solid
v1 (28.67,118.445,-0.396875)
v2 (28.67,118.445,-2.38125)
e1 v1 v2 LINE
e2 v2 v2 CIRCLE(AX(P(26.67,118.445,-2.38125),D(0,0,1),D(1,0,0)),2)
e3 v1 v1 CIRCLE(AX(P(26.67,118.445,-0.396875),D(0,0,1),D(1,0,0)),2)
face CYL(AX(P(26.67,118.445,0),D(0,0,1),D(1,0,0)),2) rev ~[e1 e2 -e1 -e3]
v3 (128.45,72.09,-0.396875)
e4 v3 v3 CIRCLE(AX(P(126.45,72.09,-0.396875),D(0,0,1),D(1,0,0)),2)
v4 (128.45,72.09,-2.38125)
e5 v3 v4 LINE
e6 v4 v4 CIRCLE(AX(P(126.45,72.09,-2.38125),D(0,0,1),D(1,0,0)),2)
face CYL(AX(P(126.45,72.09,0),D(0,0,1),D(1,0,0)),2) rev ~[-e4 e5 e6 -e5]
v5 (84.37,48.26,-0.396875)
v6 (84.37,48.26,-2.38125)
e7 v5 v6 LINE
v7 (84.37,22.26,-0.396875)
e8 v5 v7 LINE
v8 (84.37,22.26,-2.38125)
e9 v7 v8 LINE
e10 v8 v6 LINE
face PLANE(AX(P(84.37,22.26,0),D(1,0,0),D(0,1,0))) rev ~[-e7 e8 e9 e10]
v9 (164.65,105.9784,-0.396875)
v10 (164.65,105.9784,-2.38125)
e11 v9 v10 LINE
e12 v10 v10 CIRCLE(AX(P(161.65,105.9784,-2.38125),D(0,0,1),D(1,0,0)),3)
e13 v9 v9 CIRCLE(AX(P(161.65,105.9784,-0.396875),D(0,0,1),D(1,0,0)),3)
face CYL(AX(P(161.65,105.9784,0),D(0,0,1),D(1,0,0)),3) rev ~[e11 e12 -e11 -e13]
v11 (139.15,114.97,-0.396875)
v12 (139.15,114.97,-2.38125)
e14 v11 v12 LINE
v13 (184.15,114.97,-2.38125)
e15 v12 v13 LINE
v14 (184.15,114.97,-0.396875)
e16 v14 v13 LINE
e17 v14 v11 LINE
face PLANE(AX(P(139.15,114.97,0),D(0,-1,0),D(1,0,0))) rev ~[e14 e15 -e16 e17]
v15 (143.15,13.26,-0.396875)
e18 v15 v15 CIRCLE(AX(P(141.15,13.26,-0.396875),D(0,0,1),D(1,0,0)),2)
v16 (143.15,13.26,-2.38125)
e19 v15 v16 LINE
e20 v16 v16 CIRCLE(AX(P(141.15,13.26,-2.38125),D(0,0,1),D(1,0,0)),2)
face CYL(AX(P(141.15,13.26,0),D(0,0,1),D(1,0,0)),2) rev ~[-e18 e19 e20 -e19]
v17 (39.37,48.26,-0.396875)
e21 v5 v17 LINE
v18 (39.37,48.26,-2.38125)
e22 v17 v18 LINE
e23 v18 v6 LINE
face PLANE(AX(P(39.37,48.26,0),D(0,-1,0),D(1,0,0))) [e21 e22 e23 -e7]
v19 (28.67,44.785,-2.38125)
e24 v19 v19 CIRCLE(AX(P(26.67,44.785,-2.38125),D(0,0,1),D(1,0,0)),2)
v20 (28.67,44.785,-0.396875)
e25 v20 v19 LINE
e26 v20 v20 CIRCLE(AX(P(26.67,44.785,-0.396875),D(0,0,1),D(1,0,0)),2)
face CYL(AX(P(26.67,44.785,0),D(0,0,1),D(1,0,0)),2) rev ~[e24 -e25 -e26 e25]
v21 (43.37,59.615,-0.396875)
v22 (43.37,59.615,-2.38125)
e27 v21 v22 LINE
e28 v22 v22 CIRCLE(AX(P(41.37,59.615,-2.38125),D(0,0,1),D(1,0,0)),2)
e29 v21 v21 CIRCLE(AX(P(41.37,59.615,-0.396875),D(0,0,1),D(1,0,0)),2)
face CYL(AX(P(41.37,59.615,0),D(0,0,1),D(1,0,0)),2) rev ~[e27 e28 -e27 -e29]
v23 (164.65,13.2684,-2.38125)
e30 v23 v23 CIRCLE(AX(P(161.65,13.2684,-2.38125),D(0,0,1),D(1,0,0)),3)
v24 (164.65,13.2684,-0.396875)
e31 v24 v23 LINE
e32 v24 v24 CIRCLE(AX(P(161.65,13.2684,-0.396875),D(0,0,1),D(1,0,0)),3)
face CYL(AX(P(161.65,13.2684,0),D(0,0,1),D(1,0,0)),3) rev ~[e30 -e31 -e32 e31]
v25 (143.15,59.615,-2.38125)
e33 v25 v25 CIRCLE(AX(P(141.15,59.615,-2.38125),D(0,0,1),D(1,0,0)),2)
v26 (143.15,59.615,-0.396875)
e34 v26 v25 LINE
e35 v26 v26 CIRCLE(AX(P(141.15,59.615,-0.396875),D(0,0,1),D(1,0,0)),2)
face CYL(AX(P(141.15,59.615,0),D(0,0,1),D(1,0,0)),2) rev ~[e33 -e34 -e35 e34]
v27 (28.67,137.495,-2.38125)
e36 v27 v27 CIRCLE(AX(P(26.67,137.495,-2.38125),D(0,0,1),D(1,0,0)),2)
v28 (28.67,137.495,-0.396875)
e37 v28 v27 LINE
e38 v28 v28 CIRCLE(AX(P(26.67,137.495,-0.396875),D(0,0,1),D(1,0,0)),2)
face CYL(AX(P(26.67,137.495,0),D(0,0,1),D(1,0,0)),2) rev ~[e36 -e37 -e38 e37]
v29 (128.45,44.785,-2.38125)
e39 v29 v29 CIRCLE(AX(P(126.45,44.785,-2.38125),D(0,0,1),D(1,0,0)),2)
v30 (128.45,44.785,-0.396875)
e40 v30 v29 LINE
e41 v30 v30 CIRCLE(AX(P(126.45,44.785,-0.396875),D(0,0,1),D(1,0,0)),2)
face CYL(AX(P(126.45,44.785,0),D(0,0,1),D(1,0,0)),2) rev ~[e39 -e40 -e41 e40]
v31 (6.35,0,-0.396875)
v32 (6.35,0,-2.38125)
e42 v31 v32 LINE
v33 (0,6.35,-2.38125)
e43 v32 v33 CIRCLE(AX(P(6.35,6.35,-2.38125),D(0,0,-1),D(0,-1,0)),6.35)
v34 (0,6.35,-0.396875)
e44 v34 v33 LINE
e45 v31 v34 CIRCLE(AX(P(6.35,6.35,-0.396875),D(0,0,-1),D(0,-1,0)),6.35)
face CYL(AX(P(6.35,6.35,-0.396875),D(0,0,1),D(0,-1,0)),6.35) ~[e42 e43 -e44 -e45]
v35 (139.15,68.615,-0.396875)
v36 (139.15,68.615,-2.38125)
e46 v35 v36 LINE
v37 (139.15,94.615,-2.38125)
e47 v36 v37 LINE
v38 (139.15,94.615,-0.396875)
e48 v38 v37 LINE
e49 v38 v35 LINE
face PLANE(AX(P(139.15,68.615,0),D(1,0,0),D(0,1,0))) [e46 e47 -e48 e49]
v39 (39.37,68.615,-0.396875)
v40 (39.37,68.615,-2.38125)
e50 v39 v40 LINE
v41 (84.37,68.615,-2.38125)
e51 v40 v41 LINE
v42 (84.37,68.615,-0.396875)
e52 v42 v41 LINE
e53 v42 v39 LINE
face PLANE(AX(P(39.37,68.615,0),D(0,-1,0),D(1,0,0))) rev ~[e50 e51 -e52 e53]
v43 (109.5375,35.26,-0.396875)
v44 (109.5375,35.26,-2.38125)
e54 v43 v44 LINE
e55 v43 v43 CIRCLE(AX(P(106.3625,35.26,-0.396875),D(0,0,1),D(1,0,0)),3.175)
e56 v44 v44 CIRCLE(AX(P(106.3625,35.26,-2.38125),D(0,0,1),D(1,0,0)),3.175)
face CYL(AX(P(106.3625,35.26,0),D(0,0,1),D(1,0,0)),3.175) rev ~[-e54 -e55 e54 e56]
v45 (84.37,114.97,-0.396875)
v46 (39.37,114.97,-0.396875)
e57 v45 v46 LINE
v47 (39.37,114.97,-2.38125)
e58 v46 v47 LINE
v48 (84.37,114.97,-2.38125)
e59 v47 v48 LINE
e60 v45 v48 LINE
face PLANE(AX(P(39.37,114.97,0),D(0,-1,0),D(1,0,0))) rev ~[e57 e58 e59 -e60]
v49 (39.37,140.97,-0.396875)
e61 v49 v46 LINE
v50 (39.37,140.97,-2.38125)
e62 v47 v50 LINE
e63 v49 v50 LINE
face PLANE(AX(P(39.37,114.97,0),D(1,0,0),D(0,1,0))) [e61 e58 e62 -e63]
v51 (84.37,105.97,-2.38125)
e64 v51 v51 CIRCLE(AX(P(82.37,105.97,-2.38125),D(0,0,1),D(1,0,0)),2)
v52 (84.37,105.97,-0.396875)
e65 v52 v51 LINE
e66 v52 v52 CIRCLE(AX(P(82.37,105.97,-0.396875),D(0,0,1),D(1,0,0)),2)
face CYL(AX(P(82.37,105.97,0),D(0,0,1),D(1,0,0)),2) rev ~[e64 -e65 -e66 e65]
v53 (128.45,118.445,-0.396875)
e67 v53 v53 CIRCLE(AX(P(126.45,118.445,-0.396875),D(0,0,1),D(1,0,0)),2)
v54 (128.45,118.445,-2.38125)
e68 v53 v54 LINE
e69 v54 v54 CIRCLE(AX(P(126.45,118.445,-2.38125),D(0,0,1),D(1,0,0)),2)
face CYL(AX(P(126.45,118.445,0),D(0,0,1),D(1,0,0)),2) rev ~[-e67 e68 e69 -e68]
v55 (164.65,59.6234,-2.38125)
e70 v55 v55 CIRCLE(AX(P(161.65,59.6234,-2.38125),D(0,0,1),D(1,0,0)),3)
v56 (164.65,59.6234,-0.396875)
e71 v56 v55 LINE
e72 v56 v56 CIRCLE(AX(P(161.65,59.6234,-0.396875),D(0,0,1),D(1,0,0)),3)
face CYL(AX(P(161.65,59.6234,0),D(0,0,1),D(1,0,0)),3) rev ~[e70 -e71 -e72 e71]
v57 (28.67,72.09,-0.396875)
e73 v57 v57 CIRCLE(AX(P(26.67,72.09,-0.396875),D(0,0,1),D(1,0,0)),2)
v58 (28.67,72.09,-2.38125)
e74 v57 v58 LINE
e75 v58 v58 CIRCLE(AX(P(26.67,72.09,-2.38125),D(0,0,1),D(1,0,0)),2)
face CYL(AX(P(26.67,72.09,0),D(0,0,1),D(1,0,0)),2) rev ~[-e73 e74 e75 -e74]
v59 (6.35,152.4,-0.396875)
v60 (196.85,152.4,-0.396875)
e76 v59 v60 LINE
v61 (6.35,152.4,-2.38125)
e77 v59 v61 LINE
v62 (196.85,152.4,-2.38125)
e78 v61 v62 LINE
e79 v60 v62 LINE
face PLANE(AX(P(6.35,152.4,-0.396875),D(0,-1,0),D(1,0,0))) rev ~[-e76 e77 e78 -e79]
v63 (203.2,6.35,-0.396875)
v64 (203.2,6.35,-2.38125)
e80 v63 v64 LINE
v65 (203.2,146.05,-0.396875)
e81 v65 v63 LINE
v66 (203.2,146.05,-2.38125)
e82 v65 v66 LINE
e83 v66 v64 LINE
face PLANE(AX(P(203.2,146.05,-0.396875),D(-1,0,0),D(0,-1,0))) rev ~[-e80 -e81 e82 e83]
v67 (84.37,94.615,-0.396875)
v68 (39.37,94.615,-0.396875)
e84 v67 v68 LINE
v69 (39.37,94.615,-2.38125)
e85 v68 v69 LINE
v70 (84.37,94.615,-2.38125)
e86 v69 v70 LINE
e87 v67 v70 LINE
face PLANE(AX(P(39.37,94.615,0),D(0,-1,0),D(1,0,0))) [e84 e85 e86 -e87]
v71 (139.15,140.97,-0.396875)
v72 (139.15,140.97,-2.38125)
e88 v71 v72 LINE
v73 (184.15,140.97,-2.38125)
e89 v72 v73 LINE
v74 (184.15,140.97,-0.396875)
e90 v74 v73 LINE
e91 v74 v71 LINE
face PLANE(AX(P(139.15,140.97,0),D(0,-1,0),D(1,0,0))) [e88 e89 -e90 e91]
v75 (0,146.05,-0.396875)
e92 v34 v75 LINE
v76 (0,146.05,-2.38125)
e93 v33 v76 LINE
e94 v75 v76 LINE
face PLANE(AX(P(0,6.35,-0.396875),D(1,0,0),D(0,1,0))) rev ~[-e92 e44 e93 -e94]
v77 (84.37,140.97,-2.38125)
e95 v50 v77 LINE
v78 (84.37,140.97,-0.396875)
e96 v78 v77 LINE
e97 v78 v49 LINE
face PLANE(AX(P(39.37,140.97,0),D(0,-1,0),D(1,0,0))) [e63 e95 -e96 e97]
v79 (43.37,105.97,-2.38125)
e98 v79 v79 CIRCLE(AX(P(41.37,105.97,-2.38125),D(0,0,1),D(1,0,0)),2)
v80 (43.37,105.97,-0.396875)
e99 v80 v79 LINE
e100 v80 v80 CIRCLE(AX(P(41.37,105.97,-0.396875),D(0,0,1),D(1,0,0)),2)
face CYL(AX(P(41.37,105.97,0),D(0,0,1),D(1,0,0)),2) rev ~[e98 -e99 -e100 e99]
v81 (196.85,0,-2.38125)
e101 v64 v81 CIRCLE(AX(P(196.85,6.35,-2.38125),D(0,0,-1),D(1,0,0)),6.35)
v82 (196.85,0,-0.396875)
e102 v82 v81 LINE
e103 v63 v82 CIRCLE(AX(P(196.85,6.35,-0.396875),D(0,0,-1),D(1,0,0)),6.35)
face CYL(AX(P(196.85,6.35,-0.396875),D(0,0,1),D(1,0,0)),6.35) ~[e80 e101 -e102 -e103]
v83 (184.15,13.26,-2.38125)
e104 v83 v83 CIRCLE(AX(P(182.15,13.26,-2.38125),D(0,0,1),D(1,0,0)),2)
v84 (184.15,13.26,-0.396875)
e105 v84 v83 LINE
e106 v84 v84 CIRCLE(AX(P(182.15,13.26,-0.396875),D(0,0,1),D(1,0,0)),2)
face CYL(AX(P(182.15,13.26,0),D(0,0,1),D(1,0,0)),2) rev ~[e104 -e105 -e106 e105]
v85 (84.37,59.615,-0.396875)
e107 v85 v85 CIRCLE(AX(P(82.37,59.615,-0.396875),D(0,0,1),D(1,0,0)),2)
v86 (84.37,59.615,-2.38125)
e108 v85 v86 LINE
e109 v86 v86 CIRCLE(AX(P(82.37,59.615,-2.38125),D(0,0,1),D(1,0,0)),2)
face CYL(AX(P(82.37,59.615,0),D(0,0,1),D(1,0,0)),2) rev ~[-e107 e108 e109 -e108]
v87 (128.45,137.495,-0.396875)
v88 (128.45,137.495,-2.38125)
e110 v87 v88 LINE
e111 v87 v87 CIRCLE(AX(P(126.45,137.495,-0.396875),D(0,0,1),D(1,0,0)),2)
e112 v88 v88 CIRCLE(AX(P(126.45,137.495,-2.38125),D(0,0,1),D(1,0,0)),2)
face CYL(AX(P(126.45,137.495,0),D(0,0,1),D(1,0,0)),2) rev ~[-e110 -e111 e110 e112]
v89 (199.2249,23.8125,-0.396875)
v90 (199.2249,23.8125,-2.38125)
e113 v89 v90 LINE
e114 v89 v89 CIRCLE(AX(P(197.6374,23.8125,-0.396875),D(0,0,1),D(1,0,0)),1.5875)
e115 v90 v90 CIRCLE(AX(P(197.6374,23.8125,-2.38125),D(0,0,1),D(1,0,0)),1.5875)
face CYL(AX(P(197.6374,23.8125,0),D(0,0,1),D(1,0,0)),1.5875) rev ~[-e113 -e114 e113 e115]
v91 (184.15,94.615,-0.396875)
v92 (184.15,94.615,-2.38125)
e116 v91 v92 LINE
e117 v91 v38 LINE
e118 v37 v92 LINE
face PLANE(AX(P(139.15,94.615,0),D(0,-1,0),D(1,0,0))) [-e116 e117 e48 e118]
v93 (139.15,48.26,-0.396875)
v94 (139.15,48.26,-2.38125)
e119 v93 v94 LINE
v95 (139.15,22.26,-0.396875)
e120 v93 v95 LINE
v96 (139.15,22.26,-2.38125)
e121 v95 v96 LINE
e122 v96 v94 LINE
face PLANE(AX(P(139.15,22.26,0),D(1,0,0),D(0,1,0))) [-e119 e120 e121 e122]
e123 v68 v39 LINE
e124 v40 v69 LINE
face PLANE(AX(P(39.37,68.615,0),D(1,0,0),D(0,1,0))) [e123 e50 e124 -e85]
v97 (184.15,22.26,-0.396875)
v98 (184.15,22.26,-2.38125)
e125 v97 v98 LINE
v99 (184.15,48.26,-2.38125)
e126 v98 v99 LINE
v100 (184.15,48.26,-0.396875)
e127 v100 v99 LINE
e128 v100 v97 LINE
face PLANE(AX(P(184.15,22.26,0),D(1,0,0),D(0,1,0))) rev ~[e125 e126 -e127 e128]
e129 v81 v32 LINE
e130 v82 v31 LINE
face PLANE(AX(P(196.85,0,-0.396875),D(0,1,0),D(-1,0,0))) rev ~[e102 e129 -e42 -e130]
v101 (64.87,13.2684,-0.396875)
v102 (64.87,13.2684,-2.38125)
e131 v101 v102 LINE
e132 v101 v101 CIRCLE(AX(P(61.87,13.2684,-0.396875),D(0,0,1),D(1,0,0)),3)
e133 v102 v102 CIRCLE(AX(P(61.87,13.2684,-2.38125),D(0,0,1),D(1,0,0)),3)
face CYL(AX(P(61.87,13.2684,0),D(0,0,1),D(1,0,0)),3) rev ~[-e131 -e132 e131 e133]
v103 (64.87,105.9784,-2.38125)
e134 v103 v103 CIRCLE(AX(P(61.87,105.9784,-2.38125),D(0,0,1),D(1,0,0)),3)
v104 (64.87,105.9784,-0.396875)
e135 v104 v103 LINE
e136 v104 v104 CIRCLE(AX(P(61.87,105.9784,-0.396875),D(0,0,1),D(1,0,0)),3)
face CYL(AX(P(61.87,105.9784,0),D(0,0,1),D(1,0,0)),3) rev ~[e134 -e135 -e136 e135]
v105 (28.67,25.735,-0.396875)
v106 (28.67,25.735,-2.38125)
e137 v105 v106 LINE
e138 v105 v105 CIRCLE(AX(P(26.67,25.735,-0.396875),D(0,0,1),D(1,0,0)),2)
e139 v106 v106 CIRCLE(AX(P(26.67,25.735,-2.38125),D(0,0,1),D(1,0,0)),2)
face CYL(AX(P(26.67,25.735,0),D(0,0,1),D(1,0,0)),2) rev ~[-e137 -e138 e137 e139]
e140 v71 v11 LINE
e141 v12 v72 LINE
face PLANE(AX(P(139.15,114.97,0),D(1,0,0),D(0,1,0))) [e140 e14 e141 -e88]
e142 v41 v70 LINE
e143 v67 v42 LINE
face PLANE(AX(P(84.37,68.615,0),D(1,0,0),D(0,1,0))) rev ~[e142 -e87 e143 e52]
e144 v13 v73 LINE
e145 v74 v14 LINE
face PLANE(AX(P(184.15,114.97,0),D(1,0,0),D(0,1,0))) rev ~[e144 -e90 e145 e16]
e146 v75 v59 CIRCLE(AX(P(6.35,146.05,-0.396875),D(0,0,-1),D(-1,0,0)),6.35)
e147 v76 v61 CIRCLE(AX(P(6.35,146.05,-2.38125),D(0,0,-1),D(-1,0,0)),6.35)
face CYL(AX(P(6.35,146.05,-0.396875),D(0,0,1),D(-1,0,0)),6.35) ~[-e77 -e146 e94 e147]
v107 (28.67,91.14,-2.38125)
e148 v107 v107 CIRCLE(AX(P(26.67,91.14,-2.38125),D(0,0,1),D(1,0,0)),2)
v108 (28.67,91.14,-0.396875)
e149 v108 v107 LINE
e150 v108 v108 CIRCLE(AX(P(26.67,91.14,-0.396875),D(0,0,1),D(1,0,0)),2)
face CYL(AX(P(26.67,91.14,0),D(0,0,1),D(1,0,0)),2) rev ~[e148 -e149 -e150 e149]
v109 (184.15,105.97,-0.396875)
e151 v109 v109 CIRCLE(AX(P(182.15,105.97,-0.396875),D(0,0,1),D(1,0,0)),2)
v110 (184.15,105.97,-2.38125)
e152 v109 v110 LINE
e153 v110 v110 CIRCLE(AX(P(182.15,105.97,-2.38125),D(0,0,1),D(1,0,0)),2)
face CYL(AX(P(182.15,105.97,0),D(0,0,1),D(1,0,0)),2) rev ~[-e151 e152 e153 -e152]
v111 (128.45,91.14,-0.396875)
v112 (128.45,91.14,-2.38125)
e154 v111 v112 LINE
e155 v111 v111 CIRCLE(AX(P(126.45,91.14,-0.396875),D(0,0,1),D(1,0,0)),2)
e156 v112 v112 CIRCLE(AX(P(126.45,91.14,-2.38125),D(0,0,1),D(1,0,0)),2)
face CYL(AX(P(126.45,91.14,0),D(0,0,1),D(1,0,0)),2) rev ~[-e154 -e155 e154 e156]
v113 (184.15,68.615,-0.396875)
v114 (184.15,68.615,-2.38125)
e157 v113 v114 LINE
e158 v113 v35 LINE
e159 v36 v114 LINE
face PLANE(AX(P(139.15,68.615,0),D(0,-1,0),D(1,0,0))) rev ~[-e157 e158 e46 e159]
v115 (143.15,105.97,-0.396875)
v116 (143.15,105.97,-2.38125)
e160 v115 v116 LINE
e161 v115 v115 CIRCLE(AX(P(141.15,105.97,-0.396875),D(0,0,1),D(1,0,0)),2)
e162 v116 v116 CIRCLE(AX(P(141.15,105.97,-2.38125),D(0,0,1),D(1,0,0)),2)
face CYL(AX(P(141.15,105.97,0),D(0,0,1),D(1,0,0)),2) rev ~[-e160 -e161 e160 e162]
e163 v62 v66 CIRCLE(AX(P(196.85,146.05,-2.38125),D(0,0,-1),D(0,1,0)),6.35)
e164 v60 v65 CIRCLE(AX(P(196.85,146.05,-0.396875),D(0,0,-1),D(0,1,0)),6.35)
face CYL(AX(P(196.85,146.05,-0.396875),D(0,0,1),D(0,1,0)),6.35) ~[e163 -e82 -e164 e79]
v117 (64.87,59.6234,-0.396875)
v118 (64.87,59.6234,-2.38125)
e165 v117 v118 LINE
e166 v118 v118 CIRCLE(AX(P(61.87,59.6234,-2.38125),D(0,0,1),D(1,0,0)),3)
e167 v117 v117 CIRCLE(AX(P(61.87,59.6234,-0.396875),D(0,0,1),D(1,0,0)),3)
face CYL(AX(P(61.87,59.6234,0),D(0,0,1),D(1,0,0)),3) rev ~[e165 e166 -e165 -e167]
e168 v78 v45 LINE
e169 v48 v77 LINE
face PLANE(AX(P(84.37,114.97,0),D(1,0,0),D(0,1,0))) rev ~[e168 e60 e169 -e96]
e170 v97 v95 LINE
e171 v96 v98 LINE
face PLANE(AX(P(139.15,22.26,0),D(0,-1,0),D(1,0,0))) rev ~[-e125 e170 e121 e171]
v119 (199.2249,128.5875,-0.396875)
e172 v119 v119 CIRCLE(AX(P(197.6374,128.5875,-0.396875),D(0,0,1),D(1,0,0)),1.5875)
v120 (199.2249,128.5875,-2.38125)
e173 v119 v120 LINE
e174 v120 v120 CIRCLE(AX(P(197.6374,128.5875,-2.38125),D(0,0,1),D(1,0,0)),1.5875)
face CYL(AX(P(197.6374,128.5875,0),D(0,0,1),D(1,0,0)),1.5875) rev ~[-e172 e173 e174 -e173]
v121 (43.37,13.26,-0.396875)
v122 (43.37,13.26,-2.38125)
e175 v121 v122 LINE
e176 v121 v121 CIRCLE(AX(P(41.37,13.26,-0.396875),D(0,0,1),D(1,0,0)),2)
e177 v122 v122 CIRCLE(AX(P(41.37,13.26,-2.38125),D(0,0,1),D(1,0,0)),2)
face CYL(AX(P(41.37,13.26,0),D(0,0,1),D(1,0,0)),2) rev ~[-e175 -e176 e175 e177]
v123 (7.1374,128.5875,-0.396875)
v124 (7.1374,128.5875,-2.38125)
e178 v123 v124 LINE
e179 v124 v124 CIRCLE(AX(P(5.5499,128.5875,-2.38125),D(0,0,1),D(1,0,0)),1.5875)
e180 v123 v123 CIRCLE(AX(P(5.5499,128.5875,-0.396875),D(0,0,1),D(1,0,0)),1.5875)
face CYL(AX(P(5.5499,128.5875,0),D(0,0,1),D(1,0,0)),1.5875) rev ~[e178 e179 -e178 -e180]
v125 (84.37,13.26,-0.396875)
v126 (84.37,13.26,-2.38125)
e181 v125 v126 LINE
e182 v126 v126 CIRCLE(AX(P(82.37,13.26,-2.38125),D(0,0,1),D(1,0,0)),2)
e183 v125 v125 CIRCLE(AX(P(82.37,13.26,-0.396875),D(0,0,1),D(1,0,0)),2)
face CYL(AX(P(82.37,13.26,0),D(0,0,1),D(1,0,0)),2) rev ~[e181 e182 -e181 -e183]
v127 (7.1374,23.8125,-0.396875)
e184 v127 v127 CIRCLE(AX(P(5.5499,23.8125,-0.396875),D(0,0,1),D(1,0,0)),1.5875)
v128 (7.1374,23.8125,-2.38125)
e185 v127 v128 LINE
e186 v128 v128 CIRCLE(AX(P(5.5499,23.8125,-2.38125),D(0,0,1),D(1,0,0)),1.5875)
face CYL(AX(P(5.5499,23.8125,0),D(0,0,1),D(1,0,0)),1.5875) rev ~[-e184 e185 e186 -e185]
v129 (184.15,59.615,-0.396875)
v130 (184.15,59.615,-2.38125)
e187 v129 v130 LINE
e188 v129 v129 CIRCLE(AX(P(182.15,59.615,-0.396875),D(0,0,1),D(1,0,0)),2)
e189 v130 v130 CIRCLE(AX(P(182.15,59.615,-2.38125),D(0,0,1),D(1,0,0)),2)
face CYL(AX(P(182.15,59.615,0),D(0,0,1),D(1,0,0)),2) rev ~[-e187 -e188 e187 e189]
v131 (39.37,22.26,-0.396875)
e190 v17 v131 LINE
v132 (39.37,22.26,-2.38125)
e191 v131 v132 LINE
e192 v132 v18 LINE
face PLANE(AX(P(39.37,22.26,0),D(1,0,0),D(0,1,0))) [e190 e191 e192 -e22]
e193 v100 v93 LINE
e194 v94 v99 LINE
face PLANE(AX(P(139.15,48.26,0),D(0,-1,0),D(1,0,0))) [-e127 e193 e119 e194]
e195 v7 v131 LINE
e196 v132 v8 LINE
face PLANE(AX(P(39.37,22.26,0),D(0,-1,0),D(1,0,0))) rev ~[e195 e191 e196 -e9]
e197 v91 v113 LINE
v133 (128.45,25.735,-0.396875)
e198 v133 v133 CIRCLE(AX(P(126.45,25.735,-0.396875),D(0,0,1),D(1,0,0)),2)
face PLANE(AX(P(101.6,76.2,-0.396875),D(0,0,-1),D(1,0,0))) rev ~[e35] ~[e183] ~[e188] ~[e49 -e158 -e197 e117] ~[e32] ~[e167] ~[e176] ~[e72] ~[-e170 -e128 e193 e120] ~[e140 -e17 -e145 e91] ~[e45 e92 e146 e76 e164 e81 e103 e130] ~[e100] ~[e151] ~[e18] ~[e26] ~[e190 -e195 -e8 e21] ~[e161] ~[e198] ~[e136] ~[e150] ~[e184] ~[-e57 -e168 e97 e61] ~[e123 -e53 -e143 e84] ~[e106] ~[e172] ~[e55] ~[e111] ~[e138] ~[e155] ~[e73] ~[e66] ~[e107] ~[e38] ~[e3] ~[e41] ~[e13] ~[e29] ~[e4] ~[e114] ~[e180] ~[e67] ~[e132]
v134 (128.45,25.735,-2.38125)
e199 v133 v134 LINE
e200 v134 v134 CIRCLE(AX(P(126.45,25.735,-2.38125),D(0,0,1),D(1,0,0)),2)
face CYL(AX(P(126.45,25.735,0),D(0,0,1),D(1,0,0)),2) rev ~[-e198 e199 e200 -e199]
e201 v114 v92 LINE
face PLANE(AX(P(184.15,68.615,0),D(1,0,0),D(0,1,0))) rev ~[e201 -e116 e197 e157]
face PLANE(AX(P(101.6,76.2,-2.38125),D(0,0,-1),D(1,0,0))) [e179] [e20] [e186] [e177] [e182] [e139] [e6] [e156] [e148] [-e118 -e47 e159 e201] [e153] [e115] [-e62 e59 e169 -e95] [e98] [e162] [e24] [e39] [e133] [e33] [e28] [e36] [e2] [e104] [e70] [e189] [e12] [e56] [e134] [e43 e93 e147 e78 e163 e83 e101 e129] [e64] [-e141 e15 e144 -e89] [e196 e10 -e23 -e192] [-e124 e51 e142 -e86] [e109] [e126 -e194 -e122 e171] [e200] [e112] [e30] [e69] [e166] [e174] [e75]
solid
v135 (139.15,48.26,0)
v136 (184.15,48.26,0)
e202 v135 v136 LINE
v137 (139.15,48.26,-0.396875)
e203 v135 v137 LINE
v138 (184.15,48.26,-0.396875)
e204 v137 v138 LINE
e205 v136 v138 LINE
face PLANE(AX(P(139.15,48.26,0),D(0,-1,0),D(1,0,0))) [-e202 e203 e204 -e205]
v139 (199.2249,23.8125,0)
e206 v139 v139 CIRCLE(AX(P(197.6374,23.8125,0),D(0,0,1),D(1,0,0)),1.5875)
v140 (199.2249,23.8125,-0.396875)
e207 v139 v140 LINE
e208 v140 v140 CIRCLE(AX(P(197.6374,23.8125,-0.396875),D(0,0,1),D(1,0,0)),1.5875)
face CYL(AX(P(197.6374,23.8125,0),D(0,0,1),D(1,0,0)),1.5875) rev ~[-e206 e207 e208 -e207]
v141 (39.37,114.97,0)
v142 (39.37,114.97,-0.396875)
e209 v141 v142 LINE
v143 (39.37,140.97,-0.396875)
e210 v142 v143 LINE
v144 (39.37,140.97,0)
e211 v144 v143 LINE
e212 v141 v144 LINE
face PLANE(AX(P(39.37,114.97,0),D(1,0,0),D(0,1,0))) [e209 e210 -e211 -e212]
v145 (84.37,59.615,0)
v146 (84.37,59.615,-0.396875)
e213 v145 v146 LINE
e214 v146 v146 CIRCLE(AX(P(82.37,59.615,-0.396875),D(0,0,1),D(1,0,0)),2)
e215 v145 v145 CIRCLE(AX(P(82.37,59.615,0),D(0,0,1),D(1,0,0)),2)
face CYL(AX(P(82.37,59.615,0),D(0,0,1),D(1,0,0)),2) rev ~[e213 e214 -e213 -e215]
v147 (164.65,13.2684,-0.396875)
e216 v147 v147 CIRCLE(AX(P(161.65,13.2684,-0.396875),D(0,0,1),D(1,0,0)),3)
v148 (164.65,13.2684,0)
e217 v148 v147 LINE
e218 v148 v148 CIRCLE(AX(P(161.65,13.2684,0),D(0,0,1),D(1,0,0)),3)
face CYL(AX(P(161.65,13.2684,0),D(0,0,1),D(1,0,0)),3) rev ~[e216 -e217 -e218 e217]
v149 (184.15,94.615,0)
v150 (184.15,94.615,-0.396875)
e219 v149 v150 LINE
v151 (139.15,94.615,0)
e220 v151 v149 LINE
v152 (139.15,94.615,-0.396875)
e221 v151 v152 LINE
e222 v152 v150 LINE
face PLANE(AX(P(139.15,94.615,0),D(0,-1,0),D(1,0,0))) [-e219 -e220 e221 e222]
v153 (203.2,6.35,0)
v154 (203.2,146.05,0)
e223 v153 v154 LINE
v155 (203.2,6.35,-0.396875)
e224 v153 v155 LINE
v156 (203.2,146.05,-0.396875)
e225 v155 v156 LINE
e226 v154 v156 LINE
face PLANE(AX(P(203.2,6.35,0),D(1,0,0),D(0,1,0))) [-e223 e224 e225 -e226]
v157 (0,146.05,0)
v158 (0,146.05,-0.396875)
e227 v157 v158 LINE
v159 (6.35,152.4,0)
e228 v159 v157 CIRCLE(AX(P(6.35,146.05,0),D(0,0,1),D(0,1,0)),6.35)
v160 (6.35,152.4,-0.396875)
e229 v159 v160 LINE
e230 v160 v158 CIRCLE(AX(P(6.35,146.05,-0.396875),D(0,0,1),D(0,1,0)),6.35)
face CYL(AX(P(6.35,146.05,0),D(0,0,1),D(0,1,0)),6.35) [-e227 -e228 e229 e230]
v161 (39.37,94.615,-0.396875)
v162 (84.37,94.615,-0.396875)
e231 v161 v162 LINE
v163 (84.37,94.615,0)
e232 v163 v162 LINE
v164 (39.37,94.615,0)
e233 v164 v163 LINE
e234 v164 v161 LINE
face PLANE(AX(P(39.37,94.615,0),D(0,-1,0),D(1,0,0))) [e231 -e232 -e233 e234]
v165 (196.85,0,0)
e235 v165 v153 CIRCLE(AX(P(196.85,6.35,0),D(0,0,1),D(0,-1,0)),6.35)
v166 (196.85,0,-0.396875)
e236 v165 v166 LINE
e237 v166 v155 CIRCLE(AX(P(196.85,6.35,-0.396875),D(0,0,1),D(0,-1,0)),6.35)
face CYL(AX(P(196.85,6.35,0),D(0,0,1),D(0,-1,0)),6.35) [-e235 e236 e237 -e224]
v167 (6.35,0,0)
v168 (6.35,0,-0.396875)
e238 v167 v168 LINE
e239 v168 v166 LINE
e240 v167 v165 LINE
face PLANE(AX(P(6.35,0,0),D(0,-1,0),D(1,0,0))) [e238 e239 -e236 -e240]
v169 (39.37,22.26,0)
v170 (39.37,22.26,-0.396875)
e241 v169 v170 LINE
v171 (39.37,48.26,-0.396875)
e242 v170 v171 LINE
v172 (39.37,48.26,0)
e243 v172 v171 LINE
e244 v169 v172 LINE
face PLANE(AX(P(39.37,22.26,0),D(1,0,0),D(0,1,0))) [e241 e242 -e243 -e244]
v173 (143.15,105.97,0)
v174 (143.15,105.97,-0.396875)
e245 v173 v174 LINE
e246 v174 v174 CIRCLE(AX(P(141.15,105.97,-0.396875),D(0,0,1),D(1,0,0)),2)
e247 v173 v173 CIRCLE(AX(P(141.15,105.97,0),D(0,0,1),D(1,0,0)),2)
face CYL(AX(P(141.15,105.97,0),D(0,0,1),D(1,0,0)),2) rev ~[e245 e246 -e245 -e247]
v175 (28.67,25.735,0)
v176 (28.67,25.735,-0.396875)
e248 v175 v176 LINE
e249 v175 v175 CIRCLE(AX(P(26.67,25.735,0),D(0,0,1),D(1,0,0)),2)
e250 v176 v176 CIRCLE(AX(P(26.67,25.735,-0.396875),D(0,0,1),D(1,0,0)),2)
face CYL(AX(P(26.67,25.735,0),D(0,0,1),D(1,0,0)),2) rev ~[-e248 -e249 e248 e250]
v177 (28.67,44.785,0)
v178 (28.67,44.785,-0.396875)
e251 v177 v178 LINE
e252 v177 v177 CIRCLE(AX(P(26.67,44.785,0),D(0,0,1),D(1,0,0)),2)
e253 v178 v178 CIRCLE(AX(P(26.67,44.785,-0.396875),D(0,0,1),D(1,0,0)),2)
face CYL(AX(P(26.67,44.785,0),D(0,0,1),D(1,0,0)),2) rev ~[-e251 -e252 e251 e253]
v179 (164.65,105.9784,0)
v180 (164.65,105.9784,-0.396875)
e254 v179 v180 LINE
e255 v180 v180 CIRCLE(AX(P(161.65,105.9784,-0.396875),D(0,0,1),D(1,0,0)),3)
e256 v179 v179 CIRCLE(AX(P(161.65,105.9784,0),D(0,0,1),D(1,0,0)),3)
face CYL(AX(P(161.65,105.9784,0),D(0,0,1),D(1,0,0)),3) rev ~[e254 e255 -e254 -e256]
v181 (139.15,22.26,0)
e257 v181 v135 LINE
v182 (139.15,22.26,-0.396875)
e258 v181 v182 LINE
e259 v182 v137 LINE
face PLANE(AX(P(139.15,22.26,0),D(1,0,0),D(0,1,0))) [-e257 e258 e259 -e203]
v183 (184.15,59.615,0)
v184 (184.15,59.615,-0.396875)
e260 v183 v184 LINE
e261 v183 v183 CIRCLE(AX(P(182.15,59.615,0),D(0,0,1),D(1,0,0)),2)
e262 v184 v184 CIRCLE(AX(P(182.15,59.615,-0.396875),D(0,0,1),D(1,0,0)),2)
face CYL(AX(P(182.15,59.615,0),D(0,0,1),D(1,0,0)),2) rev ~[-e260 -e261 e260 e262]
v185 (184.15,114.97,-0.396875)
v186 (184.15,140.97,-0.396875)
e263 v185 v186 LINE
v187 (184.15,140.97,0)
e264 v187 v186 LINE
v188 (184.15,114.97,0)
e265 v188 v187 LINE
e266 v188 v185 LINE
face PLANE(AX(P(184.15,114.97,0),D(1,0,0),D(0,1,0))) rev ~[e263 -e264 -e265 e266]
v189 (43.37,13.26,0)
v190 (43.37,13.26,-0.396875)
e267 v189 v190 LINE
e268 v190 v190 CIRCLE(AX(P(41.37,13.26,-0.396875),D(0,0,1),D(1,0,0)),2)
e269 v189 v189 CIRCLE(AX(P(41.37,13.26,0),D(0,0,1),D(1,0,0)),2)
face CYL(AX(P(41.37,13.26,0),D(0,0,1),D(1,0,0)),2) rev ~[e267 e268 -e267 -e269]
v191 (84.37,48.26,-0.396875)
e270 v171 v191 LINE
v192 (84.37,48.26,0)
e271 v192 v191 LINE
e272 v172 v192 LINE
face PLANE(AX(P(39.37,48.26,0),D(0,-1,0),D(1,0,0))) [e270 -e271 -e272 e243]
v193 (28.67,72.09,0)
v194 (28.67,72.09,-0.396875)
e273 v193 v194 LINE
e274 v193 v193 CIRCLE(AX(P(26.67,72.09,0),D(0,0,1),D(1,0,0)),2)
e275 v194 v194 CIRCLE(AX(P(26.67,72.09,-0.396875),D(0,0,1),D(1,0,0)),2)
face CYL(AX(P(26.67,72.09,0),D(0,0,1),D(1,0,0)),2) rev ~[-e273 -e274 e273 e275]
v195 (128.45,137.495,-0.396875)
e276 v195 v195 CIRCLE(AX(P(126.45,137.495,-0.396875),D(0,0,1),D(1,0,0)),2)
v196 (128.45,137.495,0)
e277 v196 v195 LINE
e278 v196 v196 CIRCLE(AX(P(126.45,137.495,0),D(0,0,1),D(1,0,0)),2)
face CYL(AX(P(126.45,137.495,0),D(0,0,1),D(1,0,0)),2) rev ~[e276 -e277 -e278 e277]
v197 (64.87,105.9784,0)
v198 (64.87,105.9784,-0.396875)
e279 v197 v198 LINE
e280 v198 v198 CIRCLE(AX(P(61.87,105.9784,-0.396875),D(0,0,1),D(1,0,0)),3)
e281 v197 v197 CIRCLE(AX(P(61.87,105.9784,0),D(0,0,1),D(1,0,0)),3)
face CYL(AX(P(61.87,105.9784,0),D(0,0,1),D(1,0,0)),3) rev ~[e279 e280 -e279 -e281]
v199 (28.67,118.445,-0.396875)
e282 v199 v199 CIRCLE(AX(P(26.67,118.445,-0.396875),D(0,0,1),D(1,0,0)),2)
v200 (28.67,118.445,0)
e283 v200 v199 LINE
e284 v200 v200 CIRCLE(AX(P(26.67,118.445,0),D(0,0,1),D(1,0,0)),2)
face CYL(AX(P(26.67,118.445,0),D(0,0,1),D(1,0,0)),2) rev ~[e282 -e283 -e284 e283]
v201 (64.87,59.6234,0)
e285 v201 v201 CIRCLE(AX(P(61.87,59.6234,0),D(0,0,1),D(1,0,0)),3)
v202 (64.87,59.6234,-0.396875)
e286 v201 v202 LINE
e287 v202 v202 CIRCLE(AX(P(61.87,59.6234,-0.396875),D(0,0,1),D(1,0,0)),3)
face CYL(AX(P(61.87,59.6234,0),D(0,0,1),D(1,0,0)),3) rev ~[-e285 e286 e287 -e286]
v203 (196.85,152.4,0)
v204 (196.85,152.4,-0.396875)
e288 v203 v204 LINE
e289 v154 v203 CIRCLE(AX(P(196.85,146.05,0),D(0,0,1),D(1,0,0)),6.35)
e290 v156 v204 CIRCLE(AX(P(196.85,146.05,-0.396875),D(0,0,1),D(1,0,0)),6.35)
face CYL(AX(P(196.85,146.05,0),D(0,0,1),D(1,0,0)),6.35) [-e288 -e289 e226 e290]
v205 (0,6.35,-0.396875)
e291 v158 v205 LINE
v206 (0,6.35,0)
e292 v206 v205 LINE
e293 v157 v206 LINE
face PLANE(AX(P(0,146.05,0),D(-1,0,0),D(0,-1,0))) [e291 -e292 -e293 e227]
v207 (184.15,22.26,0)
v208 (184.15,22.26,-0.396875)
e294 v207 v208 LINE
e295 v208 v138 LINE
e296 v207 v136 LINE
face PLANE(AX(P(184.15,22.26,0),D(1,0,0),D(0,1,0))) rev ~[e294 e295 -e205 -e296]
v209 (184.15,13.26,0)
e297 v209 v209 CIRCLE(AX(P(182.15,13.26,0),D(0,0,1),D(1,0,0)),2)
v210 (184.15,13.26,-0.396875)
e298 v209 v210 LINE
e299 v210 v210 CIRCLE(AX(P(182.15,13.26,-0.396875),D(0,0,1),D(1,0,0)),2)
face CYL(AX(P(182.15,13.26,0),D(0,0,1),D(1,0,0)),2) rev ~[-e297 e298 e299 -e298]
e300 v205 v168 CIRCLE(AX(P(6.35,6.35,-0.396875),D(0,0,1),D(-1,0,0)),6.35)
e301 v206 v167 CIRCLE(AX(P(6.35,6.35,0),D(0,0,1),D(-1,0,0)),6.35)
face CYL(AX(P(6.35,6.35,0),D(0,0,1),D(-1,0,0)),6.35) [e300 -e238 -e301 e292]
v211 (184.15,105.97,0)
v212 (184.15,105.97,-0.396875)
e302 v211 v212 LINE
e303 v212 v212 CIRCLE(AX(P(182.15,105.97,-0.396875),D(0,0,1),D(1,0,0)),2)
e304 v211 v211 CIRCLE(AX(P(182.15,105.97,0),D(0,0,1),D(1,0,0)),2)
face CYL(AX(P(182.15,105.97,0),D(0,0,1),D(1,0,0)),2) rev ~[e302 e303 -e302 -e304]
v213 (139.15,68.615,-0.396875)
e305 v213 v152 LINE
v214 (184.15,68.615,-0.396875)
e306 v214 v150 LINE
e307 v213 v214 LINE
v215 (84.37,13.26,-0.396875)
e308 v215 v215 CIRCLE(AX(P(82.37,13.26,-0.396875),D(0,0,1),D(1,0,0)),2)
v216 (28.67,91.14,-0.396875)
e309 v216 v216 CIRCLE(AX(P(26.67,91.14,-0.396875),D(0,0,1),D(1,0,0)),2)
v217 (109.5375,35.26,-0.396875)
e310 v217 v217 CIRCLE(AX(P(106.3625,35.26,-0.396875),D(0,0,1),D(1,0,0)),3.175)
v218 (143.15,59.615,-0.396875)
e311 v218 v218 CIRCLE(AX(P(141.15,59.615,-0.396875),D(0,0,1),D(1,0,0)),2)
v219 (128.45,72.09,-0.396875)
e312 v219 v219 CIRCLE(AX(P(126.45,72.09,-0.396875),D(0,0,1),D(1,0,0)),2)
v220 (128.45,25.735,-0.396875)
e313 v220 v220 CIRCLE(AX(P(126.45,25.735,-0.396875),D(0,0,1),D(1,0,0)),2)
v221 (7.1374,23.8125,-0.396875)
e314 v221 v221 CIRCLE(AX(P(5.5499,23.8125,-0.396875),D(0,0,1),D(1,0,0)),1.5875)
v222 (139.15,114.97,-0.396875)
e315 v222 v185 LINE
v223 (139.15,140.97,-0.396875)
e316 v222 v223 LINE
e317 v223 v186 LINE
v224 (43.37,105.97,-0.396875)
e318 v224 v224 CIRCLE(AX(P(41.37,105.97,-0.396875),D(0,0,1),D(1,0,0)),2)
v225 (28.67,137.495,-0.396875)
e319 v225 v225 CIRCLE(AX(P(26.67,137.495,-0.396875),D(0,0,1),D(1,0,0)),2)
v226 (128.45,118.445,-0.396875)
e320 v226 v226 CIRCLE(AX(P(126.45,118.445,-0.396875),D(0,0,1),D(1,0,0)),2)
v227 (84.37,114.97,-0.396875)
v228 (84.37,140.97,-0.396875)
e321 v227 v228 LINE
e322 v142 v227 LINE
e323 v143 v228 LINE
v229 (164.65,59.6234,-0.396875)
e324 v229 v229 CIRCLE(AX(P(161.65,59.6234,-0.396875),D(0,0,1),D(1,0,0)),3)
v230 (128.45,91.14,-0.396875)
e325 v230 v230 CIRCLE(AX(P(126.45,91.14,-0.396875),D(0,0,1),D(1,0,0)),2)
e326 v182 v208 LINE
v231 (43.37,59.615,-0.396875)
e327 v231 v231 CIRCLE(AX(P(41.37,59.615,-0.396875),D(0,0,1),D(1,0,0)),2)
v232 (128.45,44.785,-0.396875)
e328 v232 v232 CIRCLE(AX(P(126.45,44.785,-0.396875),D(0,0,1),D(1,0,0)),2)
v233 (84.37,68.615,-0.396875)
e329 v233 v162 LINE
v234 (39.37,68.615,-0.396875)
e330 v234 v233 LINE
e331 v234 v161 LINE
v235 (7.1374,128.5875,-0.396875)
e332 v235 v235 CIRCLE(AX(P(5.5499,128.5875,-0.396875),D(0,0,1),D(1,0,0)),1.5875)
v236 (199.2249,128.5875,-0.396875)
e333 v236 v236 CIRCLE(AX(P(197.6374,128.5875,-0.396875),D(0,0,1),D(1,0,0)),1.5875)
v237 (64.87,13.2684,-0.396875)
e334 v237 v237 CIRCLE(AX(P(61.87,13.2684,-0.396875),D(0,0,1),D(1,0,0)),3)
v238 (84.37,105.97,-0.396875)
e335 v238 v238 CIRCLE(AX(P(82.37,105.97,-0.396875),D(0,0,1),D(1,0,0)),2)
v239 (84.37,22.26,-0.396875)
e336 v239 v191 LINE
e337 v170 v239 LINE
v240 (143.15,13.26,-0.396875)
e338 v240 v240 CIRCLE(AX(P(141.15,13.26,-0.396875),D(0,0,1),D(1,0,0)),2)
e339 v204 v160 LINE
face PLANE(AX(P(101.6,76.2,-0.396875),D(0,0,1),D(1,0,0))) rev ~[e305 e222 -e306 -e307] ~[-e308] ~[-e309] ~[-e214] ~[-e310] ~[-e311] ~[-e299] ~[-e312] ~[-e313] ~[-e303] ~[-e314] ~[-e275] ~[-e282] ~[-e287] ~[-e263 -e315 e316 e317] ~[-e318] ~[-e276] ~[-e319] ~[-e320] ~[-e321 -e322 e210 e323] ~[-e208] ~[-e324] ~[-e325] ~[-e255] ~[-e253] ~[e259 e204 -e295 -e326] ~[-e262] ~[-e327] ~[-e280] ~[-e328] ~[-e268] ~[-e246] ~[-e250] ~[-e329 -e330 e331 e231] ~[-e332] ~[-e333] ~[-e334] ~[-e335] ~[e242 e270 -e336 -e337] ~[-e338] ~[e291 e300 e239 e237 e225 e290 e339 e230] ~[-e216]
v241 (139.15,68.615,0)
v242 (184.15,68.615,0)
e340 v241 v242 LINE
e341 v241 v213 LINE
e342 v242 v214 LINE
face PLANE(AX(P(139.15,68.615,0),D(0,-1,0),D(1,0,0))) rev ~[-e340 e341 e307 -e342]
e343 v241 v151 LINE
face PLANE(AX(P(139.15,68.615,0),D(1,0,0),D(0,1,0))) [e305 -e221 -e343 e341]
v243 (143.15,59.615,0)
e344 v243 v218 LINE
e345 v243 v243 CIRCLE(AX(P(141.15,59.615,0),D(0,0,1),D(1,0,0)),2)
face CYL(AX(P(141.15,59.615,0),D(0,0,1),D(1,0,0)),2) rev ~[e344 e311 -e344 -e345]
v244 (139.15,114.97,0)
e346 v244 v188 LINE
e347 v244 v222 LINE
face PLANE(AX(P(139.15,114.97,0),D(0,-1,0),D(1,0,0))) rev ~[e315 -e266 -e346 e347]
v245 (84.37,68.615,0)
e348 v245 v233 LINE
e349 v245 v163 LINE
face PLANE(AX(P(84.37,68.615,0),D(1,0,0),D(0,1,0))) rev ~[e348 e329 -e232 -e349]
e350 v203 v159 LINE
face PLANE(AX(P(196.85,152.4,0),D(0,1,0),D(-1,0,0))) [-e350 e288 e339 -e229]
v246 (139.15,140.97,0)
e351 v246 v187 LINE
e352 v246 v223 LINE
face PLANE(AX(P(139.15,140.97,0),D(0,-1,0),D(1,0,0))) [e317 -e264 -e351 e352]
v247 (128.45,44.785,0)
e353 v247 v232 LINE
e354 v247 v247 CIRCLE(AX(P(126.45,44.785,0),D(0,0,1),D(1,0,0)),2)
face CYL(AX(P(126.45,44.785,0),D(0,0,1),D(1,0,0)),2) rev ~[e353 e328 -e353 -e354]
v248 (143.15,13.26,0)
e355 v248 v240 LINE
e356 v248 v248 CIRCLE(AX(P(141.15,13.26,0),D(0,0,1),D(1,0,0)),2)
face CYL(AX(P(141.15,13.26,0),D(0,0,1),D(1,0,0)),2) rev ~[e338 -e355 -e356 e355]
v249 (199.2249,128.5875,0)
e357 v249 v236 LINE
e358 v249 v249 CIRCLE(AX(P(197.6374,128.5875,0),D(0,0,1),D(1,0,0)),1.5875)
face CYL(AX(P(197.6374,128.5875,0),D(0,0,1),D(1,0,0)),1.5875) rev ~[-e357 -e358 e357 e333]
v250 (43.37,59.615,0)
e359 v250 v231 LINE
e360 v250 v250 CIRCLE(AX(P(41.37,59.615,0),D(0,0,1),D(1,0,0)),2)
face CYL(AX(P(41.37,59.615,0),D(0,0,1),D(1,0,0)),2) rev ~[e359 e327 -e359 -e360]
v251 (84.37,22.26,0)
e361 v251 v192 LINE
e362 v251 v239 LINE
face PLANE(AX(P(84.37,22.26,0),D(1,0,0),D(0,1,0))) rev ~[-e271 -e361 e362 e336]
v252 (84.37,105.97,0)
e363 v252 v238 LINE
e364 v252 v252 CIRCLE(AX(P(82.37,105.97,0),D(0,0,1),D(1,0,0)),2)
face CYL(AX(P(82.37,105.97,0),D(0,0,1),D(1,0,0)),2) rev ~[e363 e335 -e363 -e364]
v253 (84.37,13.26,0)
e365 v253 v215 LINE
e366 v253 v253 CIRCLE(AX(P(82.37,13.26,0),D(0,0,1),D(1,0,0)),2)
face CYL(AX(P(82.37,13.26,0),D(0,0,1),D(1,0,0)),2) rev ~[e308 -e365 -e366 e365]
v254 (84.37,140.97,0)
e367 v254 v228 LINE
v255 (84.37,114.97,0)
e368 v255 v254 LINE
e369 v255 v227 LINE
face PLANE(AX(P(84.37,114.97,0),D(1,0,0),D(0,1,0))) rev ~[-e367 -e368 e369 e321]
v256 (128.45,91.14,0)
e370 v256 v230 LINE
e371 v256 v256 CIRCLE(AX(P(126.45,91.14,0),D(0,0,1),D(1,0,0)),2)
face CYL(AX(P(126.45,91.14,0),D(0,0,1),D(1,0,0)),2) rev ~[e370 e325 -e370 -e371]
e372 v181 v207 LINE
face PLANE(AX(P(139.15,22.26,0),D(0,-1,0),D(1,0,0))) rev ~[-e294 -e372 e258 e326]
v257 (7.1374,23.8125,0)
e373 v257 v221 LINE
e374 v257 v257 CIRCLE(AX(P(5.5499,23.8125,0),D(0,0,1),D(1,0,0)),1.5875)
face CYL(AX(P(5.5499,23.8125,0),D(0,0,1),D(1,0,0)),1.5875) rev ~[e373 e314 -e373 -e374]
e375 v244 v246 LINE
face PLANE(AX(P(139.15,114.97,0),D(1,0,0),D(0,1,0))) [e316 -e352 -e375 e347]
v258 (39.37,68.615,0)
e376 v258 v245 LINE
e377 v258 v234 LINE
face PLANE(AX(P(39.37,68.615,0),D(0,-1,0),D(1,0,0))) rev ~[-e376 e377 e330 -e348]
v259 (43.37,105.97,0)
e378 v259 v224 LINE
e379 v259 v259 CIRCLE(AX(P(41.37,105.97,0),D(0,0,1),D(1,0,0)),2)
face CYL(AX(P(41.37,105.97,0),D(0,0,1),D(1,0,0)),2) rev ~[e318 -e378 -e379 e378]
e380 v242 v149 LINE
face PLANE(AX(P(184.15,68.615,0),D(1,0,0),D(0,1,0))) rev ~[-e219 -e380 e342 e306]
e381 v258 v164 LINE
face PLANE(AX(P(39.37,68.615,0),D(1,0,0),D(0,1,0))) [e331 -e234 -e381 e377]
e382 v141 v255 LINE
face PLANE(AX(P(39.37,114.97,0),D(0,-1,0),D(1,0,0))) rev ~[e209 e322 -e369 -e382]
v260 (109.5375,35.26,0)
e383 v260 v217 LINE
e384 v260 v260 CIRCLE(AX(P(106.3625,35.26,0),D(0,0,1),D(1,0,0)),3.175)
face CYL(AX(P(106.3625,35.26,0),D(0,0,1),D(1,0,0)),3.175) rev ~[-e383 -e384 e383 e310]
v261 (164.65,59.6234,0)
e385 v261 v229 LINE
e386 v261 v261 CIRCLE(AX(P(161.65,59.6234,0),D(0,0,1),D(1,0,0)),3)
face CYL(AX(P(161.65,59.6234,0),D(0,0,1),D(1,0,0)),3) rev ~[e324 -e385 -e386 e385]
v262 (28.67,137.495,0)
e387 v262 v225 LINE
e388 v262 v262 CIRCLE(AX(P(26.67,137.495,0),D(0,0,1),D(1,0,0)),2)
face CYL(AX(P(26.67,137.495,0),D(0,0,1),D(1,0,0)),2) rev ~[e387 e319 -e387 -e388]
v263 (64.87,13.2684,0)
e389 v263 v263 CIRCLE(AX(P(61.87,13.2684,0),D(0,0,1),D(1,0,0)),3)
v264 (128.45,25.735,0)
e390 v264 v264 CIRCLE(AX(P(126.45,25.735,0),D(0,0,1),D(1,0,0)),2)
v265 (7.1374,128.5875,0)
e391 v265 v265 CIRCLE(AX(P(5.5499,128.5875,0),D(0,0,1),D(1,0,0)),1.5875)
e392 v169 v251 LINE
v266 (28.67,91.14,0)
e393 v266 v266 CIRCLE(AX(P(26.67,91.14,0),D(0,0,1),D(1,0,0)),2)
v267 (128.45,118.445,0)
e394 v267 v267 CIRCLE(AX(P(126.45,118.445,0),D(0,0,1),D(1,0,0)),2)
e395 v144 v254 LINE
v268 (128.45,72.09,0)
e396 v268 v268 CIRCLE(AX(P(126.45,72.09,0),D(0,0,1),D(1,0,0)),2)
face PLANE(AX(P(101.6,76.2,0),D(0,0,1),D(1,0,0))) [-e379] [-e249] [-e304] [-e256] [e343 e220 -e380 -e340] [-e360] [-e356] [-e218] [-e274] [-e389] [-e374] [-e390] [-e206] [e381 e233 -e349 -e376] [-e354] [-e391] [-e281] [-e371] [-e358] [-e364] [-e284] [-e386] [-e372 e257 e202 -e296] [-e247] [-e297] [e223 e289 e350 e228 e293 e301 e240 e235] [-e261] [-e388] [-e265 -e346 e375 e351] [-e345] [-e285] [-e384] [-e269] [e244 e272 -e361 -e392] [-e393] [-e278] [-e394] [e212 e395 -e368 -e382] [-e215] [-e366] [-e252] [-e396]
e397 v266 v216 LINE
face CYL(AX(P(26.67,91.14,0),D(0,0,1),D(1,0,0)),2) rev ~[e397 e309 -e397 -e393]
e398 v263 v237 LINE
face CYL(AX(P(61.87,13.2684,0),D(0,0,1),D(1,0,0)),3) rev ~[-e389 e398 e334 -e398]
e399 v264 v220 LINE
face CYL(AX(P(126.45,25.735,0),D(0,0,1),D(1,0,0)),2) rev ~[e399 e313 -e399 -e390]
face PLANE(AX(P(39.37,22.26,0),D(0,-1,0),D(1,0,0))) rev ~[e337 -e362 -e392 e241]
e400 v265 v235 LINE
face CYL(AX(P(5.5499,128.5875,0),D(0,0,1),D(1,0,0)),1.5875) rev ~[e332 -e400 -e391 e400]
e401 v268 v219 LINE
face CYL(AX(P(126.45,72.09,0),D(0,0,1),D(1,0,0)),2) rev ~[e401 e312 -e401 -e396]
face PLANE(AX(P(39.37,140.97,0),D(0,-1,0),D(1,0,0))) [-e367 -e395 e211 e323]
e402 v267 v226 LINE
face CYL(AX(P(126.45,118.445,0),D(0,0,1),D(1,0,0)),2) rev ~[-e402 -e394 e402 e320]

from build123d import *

# Parameters (mm, degrees)
F3_DEPTH  = 0.396875
F5_DEPTH  = 1.984375
F6_W      = 45
F6_H      = 26
F7_DEPTH  = 2.38125
F8_R      = 3.175
F8_R_2    = 2
F10_DEPTH = 2.38125
F9_R      = 3
F11_DEPTH = 2.38125
F12_R     = 1.5875
F13_DEPTH = 2.38125


# Not quite as in the source:
# - a length typed as a fraction of an inch, garbled in the dataset ("3 / 203.2 mm" for 3/8 in), is restored


with BuildPart() as f3:
    # F0 (on Top) → F3 (new body)
    with BuildSketch(Plane.XY):
        with BuildLine():
            ThreePointArc((0, 6.35), (1.8598719395, 1.8598719395), (6.35, 0))
            Line((6.35, 0), (196.85, 0))
            ThreePointArc((196.85, 0), (201.3401280605, 1.8598719395), (203.2, 6.35))
            Line((203.2, 6.35), (203.2, 146.05))
            ThreePointArc((203.2, 146.05), (201.3401280605, 150.5401280605), (196.85, 152.4))
            Line((196.85, 152.4), (6.35, 152.4))
            ThreePointArc((6.35, 152.4), (1.8598719395, 150.5401280605), (0, 146.05))
            Line((0, 146.05), (0, 6.35))
        make_face()
    extrude(amount=-F3_DEPTH)


with BuildPart() as f5:
    # F4 (on face) → F5 (new body)
    with BuildSketch(Plane(origin=(0, 0, -0.396875), x_dir=(1, 0, 0), z_dir=(0, 0, -1))):
        with BuildLine():
            Line((6.35, -152.4), (196.85, -152.4))
            ThreePointArc((196.85, -152.4), (201.3401280605, -150.5401280605), (203.2, -146.05))
            Line((203.2, -146.05), (203.2, -6.35))
            ThreePointArc((203.2, -6.35), (201.3401280605, -1.8598719395), (196.85, 0))
            Line((196.85, 0), (6.35, 0))
            ThreePointArc((6.35, 0), (1.8598719395, -1.8598719395), (0, -6.35))
            Line((0, -6.35), (0, -146.05))
            ThreePointArc((0, -146.05), (1.8598719395, -150.5401280605), (6.35, -152.4))
        make_face()
    extrude(amount=F5_DEPTH)


with BuildPart() as f7_tool:
    # F6 (on face) → F7 (new body)
    with BuildSketch(Plane.XY):
        with Locations((161.65, 127.97)):
            Rectangle(F6_W, F6_H)
        with Locations((161.65, 81.615)):
            Rectangle(F6_W, F6_H)
        with Locations((161.65, 35.26)):
            Rectangle(F6_W, F6_H)
        with Locations((61.87, 127.97)):
            Rectangle(F6_W, F6_H)
        with Locations((61.87, 81.615)):
            Rectangle(F6_W, F6_H)
        with Locations((61.87, 35.26)):
            Rectangle(F6_W, F6_H)
    extrude(amount=-F7_DEPTH)


with BuildPart() as f3_1:
    add(f3.part)

    # F7: cut by f7_tool
    add(f7_tool.part, mode=Mode.SUBTRACT)


with BuildPart() as f5_1:
    add(f5.part)

    # F7: cut by f7_tool
    add(f7_tool.part, mode=Mode.SUBTRACT)


with BuildPart() as f10_tool:
    # F8 (on face) → F10 (new body)
    with BuildSketch(Plane.XY):
        with Locations((106.3625, 35.26)):
            Circle(F8_R)
        with Locations((126.45, 137.495)):
            Circle(F8_R_2)
        with Locations((141.15, 105.97)):
            Circle(F8_R_2)
        with Locations((182.15, 105.97)):
            Circle(F8_R_2)
        with Locations((126.45, 118.445)):
            Circle(F8_R_2)
        with Locations((182.15, 59.615)):
            Circle(F8_R_2)
        with Locations((141.15, 59.615)):
            Circle(F8_R_2)
        with Locations((126.45, 91.14)):
            Circle(F8_R_2)
        with Locations((126.45, 72.09)):
            Circle(F8_R_2)
        with Locations((182.15, 13.26)):
            Circle(F8_R_2)
        with Locations((141.15, 13.26)):
            Circle(F8_R_2)
        with Locations((126.45, 44.785)):
            Circle(F8_R_2)
        with Locations((126.45, 25.735)):
            Circle(F8_R_2)
        with Locations((82.37, 105.97)):
            Circle(F8_R_2)
        with Locations((41.37, 105.97)):
            Circle(F8_R_2)
        with Locations((26.67, 137.495)):
            Circle(F8_R_2)
        with Locations((26.67, 118.445)):
            Circle(F8_R_2)
        with Locations((82.37, 59.615)):
            Circle(F8_R_2)
        with Locations((41.37, 59.615)):
            Circle(F8_R_2)
        with Locations((26.67, 91.14)):
            Circle(F8_R_2)
        with Locations((26.67, 72.09)):
            Circle(F8_R_2)
        with Locations((82.37, 13.26)):
            Circle(F8_R_2)
        with Locations((41.37, 13.26)):
            Circle(F8_R_2)
        with Locations((26.67, 44.785)):
            Circle(F8_R_2)
        with Locations((26.67, 25.735)):
            Circle(F8_R_2)
    extrude(amount=-F10_DEPTH)


with BuildPart() as f3_2:
    add(f3_1.part)

    # F10: cut by f10_tool
    add(f10_tool.part, mode=Mode.SUBTRACT)


with BuildPart() as f5_2:
    add(f5_1.part)

    # F10: cut by f10_tool
    add(f10_tool.part, mode=Mode.SUBTRACT)


with BuildPart() as f11_tool:
    # F9 (on face) → F11 (new body)
    with BuildSketch(Plane.XY):
        with Locations((161.65, 105.9784)):
            Circle(F9_R)
        with Locations((161.65, 59.6234)):
            Circle(F9_R)
        with Locations((161.65, 13.2684)):
            Circle(F9_R)
        with Locations((61.87, 105.9784)):
            Circle(F9_R)
        with Locations((61.87, 59.6234)):
            Circle(F9_R)
        with Locations((61.87, 13.2684)):
            Circle(F9_R)
    extrude(amount=-F11_DEPTH)


with BuildPart() as f3_3:
    add(f3_2.part)

    # F11: cut by f11_tool
    add(f11_tool.part, mode=Mode.SUBTRACT)


with BuildPart() as f5_3:
    add(f5_2.part)

    # F11: cut by f11_tool
    add(f11_tool.part, mode=Mode.SUBTRACT)


with BuildPart() as f13_tool:
    # F12 (on face) → F13 (new body)
    with BuildSketch(Plane.XY):
        with Locations((5.5499, 128.5875)):
            Circle(F12_R)
        with Locations((5.5499, 23.8125)):
            Circle(F12_R)
        with Locations((197.6374, 128.5875)):
            Circle(F12_R)
        with Locations((197.6374, 23.8125)):
            Circle(F12_R)
    extrude(amount=-F13_DEPTH)


with BuildPart() as f3_4:
    add(f3_3.part)

    # F13: cut by f13_tool
    add(f13_tool.part, mode=Mode.SUBTRACT)


with BuildPart() as f5_4:
    add(f5_3.part)

    # F13: cut by f13_tool
    add(f13_tool.part, mode=Mode.SUBTRACT)


solid = Compound([f3_4.part, f5_4.part])
